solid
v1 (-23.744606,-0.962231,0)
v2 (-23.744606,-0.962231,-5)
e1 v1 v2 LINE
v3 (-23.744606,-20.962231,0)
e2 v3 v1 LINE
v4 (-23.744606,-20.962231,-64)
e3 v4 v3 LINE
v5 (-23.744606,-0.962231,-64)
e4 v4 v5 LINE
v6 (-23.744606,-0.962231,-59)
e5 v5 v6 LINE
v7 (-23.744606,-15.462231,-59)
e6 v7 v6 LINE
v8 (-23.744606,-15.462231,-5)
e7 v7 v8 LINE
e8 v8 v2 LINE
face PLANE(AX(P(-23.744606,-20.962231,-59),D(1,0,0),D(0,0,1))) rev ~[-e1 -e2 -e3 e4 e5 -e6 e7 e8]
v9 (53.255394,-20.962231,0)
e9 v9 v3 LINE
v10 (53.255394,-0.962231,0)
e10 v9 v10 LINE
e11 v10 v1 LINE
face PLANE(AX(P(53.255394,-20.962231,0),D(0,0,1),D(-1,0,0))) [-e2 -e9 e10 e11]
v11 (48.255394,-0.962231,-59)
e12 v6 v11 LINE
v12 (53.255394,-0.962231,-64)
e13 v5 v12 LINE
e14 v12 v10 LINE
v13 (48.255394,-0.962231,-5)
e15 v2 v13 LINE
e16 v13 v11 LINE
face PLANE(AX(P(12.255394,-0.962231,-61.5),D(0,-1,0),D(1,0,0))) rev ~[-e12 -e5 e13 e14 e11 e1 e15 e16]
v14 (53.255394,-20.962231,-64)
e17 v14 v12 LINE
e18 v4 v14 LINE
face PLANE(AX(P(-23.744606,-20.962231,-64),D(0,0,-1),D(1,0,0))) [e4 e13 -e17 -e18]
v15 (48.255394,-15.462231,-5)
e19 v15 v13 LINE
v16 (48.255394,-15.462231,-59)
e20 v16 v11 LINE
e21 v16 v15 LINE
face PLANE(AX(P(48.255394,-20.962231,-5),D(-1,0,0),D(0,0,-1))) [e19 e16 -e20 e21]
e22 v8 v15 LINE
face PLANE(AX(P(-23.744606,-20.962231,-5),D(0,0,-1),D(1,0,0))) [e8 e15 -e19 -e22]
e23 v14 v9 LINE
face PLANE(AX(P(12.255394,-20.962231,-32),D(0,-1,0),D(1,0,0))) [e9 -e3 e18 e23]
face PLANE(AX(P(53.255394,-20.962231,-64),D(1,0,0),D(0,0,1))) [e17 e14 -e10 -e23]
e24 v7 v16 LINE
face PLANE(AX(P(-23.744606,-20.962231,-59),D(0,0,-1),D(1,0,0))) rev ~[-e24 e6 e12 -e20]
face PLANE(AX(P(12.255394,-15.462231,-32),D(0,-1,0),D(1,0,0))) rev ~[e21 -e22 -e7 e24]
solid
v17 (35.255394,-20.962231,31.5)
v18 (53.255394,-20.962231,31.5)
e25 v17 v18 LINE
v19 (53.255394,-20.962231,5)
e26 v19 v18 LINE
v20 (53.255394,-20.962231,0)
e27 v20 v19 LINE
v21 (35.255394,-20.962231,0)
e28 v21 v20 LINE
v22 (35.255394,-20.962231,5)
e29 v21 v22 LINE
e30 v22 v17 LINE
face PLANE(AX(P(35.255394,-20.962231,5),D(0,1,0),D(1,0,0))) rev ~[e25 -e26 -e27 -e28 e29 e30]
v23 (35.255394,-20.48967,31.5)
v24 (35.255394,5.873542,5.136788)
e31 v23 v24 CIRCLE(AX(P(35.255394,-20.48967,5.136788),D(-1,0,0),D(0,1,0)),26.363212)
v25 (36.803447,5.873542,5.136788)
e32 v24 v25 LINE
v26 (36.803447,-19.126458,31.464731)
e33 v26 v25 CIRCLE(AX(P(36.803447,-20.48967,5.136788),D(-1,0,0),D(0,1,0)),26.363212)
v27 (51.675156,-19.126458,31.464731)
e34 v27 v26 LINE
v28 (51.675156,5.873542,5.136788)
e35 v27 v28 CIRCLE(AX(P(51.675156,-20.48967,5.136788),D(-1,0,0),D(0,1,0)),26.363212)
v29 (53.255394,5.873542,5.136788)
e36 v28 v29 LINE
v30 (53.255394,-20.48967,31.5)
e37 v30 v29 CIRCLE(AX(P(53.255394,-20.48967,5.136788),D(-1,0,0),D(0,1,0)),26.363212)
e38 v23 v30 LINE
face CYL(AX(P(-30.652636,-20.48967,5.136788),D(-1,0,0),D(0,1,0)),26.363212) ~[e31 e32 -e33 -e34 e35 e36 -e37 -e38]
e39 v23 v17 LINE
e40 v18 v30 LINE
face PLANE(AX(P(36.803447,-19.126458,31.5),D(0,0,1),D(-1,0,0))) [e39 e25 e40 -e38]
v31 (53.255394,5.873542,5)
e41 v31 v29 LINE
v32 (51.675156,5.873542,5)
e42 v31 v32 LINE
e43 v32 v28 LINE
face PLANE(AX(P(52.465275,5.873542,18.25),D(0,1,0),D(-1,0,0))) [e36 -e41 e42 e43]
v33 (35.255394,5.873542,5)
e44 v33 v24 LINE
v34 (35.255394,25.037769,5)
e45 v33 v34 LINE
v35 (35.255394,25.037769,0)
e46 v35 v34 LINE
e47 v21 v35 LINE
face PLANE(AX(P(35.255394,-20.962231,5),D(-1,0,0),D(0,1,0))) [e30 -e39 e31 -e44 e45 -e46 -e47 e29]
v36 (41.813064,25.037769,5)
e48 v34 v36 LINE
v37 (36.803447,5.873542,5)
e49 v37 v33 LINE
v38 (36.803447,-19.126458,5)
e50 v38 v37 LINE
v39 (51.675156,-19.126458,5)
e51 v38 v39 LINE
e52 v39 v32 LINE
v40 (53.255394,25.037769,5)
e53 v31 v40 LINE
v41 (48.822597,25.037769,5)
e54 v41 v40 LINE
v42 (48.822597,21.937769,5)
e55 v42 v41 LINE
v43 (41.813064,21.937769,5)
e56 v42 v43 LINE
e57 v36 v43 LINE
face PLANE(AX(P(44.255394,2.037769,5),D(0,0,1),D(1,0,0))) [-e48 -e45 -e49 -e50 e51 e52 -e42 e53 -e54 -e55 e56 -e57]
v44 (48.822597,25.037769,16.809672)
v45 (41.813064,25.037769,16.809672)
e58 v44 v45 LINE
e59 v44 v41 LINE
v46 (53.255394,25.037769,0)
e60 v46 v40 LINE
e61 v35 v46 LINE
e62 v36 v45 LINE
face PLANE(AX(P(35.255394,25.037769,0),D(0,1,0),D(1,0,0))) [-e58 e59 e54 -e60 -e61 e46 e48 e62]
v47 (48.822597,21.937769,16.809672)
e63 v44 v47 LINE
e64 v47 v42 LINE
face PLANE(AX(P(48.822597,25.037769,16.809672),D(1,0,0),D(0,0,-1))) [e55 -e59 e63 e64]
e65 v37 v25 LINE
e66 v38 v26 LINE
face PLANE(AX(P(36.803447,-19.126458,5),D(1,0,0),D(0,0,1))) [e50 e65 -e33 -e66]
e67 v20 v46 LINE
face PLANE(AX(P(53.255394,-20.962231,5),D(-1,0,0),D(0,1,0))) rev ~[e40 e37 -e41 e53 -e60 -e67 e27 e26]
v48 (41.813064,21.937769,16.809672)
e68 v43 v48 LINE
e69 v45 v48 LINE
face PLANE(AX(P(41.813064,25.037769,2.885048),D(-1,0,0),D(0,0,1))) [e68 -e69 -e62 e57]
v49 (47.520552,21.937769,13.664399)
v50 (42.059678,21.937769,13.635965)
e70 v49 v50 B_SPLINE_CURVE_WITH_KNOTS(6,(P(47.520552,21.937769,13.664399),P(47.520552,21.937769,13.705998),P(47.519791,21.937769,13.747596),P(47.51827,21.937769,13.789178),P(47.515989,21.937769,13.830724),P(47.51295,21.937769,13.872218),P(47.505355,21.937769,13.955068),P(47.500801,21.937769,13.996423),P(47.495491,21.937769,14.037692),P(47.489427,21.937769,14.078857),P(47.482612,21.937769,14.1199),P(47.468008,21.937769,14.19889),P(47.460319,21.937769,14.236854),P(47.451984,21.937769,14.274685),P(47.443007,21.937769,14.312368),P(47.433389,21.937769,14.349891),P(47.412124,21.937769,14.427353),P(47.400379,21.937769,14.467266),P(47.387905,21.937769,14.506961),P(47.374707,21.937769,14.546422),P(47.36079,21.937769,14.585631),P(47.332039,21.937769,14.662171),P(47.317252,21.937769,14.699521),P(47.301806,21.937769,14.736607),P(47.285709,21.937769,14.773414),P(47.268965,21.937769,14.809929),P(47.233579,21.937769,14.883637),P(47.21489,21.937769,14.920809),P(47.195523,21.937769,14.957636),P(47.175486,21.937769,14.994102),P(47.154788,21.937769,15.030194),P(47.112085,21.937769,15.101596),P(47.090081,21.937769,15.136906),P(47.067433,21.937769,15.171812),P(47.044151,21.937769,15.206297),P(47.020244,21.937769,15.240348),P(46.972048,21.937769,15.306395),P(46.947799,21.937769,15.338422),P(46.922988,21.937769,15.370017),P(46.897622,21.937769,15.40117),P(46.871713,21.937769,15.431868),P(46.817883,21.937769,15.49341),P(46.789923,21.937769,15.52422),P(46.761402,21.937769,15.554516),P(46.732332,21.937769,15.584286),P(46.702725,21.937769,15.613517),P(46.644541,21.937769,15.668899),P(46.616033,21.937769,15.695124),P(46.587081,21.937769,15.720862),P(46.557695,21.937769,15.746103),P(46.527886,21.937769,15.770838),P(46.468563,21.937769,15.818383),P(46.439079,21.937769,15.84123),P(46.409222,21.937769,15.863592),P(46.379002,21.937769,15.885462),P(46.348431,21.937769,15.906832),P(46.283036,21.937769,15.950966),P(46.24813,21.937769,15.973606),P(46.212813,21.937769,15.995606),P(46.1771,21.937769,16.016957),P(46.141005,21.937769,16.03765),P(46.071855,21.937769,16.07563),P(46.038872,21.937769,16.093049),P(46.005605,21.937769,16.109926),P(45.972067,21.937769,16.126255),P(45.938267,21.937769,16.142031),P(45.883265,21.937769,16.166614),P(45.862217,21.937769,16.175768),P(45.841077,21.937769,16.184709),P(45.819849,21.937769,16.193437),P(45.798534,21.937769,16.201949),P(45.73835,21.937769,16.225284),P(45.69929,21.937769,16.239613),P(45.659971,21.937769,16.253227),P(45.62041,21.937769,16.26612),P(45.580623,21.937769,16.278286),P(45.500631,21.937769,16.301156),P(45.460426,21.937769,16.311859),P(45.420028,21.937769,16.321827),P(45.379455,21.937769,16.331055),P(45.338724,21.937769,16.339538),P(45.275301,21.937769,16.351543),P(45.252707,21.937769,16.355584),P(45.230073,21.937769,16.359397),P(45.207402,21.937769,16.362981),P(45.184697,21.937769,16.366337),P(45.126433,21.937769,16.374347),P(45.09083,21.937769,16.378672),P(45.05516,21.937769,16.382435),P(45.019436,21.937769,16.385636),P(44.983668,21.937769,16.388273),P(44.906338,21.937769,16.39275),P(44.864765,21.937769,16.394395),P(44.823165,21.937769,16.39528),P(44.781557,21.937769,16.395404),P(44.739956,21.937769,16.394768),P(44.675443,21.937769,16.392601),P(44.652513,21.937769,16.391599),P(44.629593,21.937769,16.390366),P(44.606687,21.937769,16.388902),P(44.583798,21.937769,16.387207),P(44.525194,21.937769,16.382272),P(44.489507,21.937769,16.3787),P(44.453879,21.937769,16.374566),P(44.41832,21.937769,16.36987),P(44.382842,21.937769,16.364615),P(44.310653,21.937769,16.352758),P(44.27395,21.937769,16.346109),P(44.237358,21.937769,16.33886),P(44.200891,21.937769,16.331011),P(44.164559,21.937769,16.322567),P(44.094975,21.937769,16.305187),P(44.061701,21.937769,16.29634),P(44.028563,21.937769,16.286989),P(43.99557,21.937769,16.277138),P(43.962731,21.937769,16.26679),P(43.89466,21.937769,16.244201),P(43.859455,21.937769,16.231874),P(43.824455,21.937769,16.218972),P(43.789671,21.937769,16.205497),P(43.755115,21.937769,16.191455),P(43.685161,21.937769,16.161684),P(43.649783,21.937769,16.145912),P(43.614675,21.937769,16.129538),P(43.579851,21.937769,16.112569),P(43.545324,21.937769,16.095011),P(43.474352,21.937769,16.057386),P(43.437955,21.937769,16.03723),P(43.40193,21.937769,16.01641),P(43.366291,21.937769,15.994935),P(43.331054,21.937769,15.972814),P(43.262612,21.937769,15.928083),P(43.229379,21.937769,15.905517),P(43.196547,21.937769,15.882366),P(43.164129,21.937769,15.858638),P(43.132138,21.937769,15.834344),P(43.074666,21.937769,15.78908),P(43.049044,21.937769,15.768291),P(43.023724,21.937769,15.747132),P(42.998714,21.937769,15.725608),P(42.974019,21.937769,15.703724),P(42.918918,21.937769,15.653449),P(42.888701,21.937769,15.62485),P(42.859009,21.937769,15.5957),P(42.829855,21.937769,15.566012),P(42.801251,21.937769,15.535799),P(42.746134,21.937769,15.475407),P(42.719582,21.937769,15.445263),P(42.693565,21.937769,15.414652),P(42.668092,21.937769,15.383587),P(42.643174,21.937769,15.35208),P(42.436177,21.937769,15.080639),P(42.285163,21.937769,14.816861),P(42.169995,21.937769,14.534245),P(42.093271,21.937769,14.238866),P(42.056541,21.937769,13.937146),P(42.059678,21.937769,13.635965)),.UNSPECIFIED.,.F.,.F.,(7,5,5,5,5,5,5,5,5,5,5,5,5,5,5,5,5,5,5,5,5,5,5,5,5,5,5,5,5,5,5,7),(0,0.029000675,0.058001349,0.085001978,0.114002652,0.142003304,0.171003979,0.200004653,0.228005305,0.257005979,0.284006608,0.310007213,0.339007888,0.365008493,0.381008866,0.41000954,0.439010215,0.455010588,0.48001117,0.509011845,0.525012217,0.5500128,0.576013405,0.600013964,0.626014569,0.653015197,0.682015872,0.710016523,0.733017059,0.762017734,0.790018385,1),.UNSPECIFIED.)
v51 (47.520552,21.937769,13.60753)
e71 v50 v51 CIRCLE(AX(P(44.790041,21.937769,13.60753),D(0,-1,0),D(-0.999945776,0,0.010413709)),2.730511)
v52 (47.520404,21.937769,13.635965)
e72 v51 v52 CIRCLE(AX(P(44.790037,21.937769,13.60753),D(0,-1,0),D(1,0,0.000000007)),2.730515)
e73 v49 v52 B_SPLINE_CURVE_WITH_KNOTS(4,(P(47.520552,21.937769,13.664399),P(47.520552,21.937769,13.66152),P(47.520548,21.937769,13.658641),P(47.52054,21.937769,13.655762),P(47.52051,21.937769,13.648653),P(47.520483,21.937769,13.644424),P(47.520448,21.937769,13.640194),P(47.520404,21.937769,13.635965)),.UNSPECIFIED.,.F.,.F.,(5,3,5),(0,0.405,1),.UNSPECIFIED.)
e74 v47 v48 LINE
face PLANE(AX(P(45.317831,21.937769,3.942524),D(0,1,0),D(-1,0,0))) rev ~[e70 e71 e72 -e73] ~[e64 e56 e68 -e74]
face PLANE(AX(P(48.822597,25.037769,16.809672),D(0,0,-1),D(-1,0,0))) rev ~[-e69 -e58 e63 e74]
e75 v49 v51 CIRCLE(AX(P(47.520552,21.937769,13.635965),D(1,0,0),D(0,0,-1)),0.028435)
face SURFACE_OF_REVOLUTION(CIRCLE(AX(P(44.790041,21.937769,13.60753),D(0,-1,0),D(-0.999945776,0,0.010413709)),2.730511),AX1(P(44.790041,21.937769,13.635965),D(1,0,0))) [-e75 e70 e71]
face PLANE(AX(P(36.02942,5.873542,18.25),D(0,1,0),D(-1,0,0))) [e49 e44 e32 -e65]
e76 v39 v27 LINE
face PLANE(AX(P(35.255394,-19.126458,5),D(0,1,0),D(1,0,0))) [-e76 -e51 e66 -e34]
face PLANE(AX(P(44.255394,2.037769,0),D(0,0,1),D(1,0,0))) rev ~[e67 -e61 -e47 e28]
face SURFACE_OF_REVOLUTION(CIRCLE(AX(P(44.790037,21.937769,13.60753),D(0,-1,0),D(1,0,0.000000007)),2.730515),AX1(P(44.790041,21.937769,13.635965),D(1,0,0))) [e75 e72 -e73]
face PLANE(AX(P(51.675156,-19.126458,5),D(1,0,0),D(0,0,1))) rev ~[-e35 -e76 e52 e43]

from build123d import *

# Parameters (mm, degrees)
F0_W        = 18
F0_H        = 46
F1_DEPTH    = 5
F2_W        = 18
F2_H        = 1.8357727677
F3_DEPTH    = 26.5
F4_W        = 1.548052609
F4_H        = 26.5
F4_W_2      = 1.5802383423
F5_DEPTH    = 25
F6_T1_DEPTH = 133.3641131145
F6_T3_DEPTH = 133.3962988479
F7_W        = 7.0095323026
F7_H        = 2.1149524208
F7_H_2      = 11.8096721172
F8_DEPTH    = 3.1
F11_W       = 72
F11_H       = 5
F12_DEPTH   = 20
F11_H_2     = 54
F13_DEPTH   = 5.5


# Not quite as in the source:
# - a fillet or chamfer that OpenCascade refuses, or shapes differently, is made with other operations: its cross-section is extruded or revolved along the edge and cut away or added


with BuildPart() as f1:
    # F0 (on Top) → F1 (new body)
    with BuildSketch(Plane.XY):
        with Locations((44.2553941011, 2.0377691388)):
            Rectangle(F0_W, F0_H)
    extrude(amount=F1_DEPTH)

    # F2 (on face) → F3 (join)
    with BuildSketch(Plane.XY.offset(5)):
        with Locations((44.2553941011, -20.0443444774)):
            Rectangle(F2_W, F2_H)
    extrude(amount=F3_DEPTH)

    # F4 (on face) → F5 (join)
    with BuildSketch(Plane(origin=(0, -19.1264580935, 0), x_dir=(-1, 0, 0), z_dir=(0, 1, 0))):
        with Locations((-36.0294204056, 18.25)):
            Rectangle(F4_W, F4_H)
        with Locations((-52.46527493, 18.25)):
            Rectangle(F4_W_2, F4_H)
    extrude(amount=F5_DEPTH)

    # F6: fillet of radius 26.3632121011 on 2 edges, made by hand

    # F6_s2 → F6_t1 (cut)
    with BuildSketch(Plane.YZ.offset(-30.6526361516)):
        with BuildLine():
            ThreePointArc((5.8735419065, 5.1367878989), (-1.8480641441, 23.7783939494), (-20.4896701946, 31.5))
            Line((-20.4896701946, 31.5), (5.8735419065, 31.5))
            Line((5.8735419065, 31.5), (5.8735419065, 5.1367878989))
        make_face()
    extrude(amount=F6_T1_DEPTH, mode=Mode.SUBTRACT)

    # F6_s4 → F6_t3 (cut)
    with BuildSketch(Plane.YZ.offset(-14.2328744939)):
        with BuildLine():
            ThreePointArc((5.8735419065, 5.1367878989), (-1.8480641441, 23.7783939494), (-20.4896701946, 31.5))
            Line((-20.4896701946, 31.5), (5.8735419065, 31.5))
            Line((5.8735419065, 31.5), (5.8735419065, 5.1367878989))
        make_face()
    extrude(amount=F6_T3_DEPTH, mode=Mode.SUBTRACT)

    # F7 (on face) → F8 (join)
    with BuildSketch(Plane(origin=(0, 25.0377691388, 0), x_dir=(-1, 0, 0), z_dir=(0, 1, 0))):
        with Locations((-45.3178305179, 3.9425237896)):
            Rectangle(F7_W, F7_H)
        with Locations((-45.3178305179, 10.9048360586)):
            Rectangle(F7_W, F7_H_2)
    extrude(amount=-F8_DEPTH)

    # F9 (on face) → F10 (revolve)
    with BuildSketch(Plane.XZ.offset(-21.9377691388)):
        with BuildLine():
            ThreePointArc((42.0596776895, 13.6359646723), (44.7758231938, 10.8770558073), (47.5205518922, 13.6075299233))
            ThreePointArc((47.5205518922, 13.6075299233), (47.520514877, 13.6217474905), (47.5204038326, 13.6359646723))
            Line((47.5204038326, 13.6359646723), (42.0596776895, 13.6359646723))
        make_face()
    revolve(axis=Axis((44.790040761, 21.9377691388, 13.6359646723), (1, 0, 0)))


with BuildPart() as f12:
    # F11 (on face) → F12 (new body)
    with BuildSketch(Plane.XZ.offset(20.9622308612)):
        with Locations((12.2553941011, -61.5)):
            Rectangle(F11_W, F11_H)
        Polygon((53.2553941011, -64), (53.2553941011, -5), (48.2553941011, -5), (48.2553941011, -59), (48.2553941011, -64), align=None)
        Polygon((53.2553941011, -5), (53.2553941011, 0), (35.2553941011, 0), (-23.7446058989, 0), (-23.7446058989, -5), (48.2553941011, -5), align=None)
    extrude(amount=-F12_DEPTH)

    # F11 (on face) → F13 (join)
    with BuildSketch(Plane.XZ.offset(20.9622308612)):
        with Locations((12.2553941011, -32)):
            Rectangle(F11_W, F11_H_2)
    extrude(amount=-F13_DEPTH)


solid = Compound([f1.part, f12.part])
